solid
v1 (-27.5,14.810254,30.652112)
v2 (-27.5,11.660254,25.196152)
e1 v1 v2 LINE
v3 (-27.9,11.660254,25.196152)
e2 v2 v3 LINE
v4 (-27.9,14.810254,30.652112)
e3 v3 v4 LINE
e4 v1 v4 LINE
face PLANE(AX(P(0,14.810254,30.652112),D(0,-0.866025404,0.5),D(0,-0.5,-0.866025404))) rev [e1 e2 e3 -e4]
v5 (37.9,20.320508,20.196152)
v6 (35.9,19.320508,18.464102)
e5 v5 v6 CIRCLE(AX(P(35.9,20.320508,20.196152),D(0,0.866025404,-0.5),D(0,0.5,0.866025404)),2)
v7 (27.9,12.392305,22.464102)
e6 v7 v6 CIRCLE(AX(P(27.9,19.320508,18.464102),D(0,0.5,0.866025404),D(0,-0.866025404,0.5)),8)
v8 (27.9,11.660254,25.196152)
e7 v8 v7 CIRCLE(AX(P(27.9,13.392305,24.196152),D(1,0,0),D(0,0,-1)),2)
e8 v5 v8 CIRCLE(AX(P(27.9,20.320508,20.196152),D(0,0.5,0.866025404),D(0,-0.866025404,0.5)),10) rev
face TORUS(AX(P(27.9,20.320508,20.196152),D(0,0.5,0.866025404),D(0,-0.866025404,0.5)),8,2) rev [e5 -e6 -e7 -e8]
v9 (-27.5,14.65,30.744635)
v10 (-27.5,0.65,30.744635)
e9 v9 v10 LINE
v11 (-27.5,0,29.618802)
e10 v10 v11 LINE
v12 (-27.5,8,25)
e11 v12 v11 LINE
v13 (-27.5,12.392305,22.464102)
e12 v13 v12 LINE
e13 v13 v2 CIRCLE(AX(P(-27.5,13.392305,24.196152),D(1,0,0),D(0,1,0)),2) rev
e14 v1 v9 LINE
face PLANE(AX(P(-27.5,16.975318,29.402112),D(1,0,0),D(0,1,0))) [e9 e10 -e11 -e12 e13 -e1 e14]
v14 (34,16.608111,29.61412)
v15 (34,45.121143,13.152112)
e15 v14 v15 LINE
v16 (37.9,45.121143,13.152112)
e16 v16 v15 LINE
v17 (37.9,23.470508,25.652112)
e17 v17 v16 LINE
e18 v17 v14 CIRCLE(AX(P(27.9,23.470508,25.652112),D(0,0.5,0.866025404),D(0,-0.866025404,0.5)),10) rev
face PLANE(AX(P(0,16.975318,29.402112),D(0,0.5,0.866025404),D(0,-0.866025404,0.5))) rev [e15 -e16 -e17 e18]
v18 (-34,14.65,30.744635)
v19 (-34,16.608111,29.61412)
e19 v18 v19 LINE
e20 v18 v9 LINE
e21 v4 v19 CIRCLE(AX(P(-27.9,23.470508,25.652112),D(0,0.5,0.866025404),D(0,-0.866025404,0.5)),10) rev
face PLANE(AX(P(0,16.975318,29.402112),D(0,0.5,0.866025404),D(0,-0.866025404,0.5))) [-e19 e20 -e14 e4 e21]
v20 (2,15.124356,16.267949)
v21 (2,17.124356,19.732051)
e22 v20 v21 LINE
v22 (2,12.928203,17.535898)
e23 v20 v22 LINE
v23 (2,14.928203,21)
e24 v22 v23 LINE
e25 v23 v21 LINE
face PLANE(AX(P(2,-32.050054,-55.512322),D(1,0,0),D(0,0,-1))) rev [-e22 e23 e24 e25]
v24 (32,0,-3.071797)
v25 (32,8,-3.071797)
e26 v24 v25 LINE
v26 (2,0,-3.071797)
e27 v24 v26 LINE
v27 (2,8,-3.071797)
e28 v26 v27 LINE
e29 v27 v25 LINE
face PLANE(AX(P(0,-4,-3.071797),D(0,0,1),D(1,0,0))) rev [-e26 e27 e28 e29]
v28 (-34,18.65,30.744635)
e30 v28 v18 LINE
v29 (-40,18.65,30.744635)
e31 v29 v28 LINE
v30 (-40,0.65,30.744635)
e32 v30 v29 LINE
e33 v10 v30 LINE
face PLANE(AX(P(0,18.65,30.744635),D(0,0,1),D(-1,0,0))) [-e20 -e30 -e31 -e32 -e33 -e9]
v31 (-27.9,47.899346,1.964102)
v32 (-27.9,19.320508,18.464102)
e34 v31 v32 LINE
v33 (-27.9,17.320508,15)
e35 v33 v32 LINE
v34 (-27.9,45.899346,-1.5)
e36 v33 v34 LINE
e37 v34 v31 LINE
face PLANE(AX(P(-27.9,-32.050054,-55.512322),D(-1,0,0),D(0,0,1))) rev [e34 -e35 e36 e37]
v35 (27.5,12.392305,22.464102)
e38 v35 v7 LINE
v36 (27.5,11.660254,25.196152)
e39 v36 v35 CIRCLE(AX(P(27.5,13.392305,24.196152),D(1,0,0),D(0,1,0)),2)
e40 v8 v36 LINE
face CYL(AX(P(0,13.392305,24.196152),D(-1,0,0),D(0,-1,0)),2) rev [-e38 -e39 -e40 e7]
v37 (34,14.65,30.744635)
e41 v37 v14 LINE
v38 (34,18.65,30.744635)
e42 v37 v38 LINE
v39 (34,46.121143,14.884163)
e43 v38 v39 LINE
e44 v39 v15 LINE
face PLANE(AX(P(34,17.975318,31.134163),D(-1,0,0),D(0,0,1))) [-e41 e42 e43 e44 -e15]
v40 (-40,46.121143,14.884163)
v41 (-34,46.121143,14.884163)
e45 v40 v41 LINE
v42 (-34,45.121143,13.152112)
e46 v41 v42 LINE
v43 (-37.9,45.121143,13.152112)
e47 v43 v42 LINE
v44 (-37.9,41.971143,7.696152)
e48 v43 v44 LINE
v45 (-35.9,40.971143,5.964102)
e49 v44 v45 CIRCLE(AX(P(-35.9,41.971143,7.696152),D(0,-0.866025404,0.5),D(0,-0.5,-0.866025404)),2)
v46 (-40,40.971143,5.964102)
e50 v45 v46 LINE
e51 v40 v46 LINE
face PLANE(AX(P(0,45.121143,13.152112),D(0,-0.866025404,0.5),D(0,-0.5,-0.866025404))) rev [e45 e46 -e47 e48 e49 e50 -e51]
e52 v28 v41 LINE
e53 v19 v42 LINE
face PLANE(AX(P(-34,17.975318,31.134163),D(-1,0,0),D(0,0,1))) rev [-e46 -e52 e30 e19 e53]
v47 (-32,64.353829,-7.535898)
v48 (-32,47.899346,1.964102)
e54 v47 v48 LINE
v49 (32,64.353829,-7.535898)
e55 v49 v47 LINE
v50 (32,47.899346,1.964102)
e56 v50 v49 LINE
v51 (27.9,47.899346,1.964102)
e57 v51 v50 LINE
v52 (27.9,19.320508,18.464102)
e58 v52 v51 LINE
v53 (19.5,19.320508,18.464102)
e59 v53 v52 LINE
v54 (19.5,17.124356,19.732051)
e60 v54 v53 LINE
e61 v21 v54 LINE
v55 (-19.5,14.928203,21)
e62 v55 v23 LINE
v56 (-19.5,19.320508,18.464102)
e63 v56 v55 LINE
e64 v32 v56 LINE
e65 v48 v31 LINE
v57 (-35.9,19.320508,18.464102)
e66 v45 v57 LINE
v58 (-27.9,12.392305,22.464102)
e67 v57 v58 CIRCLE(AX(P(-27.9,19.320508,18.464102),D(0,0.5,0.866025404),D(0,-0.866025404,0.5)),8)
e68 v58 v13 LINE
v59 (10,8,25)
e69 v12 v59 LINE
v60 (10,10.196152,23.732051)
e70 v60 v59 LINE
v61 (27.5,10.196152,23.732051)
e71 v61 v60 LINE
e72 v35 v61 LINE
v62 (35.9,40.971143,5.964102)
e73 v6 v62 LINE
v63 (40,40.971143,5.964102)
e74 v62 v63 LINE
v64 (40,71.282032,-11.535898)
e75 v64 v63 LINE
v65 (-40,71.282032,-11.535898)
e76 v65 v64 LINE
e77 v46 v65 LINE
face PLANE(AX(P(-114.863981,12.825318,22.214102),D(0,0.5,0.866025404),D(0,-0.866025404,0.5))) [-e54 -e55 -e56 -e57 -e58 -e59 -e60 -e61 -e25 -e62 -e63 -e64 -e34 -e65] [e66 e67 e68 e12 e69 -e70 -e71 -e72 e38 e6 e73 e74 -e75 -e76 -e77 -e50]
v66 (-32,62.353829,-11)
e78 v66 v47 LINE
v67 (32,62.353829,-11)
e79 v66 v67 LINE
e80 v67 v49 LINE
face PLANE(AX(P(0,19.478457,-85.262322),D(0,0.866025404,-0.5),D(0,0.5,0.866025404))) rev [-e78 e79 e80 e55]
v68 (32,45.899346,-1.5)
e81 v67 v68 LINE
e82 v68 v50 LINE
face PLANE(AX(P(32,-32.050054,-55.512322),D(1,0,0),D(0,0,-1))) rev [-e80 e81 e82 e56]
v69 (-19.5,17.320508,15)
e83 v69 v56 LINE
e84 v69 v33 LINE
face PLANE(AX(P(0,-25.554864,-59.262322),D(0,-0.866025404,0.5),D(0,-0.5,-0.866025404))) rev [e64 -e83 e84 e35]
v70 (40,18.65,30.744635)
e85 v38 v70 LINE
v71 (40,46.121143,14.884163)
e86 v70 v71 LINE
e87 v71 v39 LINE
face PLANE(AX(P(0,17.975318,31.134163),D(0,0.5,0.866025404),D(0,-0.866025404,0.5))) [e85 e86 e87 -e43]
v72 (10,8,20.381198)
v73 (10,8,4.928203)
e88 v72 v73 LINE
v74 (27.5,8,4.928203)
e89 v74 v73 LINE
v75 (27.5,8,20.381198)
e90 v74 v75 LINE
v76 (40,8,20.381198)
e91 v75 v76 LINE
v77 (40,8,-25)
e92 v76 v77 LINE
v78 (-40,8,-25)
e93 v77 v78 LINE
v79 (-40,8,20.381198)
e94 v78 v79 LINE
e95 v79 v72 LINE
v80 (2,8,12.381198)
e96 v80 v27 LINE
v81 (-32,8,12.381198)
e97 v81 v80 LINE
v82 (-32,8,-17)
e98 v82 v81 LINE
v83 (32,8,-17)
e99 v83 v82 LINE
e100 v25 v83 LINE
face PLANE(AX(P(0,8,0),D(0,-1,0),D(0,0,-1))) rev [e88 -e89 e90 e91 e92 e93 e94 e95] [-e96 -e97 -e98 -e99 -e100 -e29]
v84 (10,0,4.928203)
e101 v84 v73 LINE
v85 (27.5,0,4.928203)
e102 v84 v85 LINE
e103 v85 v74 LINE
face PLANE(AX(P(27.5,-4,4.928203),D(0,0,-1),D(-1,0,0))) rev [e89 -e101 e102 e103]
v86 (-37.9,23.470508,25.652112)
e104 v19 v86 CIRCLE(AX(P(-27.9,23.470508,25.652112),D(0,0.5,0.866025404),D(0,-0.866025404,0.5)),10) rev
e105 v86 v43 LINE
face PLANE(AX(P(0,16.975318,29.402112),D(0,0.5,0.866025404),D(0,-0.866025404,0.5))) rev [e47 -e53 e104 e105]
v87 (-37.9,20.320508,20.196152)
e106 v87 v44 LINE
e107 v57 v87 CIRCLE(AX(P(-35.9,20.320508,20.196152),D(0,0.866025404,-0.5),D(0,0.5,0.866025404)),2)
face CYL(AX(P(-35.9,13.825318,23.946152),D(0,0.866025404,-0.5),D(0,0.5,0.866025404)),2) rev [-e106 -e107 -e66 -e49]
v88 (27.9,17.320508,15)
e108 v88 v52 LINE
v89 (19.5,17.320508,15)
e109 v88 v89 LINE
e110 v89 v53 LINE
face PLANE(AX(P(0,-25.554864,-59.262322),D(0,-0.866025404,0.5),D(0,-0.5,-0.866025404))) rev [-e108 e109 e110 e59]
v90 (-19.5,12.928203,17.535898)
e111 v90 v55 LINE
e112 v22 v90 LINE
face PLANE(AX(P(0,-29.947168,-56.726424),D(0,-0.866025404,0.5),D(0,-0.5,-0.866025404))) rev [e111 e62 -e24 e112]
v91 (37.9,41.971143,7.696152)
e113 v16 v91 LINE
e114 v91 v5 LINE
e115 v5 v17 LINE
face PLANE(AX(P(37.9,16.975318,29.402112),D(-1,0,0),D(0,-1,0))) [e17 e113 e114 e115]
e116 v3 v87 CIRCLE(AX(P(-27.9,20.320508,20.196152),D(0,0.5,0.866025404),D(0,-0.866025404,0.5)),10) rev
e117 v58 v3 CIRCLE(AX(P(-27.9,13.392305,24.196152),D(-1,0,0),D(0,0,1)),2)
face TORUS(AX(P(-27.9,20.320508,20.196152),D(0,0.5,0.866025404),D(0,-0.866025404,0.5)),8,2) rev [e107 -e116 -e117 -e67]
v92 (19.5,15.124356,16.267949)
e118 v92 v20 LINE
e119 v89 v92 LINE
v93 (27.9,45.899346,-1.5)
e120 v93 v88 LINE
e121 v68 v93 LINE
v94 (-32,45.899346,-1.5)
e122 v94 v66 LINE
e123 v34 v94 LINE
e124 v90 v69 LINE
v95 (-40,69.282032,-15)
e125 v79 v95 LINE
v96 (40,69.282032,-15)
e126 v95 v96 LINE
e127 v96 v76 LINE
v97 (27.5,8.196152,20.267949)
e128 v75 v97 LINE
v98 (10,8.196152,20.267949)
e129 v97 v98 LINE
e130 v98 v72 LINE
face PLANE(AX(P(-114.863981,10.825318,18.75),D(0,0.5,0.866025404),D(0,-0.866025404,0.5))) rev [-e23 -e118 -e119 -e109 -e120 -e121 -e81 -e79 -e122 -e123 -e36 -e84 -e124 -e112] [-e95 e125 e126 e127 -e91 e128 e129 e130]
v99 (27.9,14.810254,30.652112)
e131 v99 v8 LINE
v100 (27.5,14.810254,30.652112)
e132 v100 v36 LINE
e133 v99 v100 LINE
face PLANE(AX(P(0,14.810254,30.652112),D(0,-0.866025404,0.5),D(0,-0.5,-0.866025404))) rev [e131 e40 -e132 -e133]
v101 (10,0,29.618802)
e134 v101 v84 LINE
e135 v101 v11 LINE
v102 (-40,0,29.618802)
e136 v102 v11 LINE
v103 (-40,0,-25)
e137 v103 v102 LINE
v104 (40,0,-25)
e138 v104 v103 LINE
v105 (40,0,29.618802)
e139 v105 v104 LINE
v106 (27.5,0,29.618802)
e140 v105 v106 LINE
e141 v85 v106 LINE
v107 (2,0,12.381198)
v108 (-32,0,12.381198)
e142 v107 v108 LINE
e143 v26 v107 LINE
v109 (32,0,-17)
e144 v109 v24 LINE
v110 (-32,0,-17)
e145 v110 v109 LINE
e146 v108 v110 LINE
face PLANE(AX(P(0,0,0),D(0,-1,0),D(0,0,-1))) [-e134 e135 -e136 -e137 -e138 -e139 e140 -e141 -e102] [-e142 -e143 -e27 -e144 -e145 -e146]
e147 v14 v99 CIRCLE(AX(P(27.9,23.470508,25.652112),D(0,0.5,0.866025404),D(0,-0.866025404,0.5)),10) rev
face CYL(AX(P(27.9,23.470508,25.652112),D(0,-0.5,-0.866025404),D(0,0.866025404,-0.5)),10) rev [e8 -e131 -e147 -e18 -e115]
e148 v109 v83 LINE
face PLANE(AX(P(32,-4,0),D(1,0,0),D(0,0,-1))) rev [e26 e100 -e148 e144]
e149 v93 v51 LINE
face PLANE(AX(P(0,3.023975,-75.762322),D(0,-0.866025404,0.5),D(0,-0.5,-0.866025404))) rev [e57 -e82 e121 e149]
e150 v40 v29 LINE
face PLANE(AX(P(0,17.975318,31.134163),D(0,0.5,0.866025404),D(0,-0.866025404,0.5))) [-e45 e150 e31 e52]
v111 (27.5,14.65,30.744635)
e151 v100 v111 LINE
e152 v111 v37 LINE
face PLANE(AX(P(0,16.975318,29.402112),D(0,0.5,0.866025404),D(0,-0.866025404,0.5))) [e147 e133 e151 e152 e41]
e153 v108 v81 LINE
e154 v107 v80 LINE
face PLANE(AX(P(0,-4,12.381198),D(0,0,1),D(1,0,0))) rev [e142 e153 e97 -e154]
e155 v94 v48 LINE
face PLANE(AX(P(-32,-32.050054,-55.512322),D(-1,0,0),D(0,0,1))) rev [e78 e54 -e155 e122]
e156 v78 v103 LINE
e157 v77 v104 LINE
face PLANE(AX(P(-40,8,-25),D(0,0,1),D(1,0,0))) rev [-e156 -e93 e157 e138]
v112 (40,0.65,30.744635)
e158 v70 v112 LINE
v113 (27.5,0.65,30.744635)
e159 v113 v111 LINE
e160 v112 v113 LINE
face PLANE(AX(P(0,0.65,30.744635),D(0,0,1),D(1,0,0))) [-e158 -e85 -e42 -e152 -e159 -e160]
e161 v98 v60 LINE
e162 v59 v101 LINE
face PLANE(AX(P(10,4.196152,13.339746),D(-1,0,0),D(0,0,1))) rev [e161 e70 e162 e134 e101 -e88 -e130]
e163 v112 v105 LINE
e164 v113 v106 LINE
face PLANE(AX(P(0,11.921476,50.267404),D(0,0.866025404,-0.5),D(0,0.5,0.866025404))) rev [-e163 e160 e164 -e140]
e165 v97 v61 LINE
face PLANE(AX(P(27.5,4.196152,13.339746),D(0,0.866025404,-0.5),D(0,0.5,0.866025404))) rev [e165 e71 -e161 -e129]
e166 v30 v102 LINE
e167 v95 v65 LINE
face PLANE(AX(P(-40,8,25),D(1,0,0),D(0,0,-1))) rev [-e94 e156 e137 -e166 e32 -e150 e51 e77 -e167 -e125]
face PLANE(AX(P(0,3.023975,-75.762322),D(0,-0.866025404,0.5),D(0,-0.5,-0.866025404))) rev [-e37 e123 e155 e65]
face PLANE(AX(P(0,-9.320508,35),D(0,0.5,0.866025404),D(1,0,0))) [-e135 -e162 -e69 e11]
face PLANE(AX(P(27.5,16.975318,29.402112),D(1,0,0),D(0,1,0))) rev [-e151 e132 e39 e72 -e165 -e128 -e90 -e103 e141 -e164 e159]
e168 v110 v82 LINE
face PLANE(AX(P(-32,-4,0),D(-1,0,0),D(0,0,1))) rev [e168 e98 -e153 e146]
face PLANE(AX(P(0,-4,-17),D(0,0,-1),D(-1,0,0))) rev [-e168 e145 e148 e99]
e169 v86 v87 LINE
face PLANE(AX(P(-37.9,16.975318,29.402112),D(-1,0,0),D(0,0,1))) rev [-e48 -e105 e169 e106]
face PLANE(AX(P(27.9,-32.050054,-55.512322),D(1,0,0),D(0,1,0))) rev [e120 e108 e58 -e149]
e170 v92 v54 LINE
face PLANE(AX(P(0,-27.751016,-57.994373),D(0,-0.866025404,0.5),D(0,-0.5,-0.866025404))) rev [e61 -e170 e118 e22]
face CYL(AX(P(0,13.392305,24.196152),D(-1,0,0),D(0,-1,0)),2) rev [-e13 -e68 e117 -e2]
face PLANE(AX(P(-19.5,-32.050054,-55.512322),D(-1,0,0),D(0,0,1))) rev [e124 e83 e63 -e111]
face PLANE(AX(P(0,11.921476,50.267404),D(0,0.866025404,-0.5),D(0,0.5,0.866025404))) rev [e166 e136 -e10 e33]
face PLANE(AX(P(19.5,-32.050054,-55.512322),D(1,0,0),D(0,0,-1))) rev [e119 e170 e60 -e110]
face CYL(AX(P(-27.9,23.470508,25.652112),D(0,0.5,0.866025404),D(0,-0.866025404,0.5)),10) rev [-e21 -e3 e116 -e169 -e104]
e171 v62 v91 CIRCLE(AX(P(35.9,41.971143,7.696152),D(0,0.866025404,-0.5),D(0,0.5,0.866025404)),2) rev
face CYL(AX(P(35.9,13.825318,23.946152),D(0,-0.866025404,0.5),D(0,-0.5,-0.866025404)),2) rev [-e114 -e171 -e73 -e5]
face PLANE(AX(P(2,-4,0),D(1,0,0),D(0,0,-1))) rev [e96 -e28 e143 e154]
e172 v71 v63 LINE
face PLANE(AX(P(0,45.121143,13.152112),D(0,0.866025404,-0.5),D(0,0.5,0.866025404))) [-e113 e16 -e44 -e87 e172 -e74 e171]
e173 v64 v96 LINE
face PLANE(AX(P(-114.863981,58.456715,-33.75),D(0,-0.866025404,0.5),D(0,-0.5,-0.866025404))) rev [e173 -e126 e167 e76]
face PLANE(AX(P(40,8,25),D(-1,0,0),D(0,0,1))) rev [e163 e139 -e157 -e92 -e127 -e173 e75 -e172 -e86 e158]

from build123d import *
from OCP.BRepFilletAPI import BRepFilletAPI_MakeChamfer

# Parameters (mm, degrees)
SKETCH1_W           = 80
SKETCH1_H           = 50
BOSS_EXTRUDE1_DEPTH = 8
BOSS_EXTRUDE2_DEPTH = 80
SKETCH3_W           = 2.1
SKETCH3_H           = 35
BOSS_EXTRUDE3_DEPTH = 8.3
FILLET1_R           = 10
FILLET2_R           = 2
BOSS_EXTRUDE4_DEPTH = 10
CHAMFER2_SIZE       = 17.320508076
CHAMFER2_SIZE_2     = 10
SKETCH5_W           = 12.5
SKETCH5_H           = 9.237604307
BOSS_EXTRUDE5_DEPTH = 8.3
SKETCH6_W           = 6
SKETCH6_H           = 47.309401077
BOSS_EXTRUDE6_DEPTH = 2
CHAMFER3_SIZE       = 9
CHAMFER3_SIZE2      = 15.588457268
SKETCH7_W           = 17.5
SKETCH7_H           = 11.773502692
CUT_EXTRUDE1_DEPTH  = 12
SKETCH8_W           = 17.5
SKETCH8_H           = 15
CUT_EXTRUDE2_DEPTH  = 12
CUT_EXTRUDE3_DEPTH  = 12
CUT_EXTRUDE4_DEPTH  = 4


with BuildPart() as part:
    # Sketch1 → Boss-Extrude1 (new body)
    with BuildSketch(Plane(origin=(0, 0, 0), x_dir=(1, 0, 0), z_dir=(0, 1, 0))):
        Rectangle(SKETCH1_W, SKETCH1_H)
    extrude(amount=BOSS_EXTRUDE1_DEPTH)

    # Sketch2 → Boss-Extrude2 (add)
    with BuildSketch(Plane(origin=(40, 0, 0), x_dir=(0, 0, -1), z_dir=(1, 0, 0))):
        Polygon((15, 69.282032303), (11.535898385, 71.282032303), (-25, 8), (-20.381197846, 8), align=None)
    extrude(amount=-BOSS_EXTRUDE2_DEPTH)

    # Sketch3 → Boss-Extrude3 (add)
    with BuildSketch(Plane(origin=(0, 12.825317547, 22.214101615), x_dir=(1, 0, 0), z_dir=(0, 0.5000000000000041, 0.8660254037844364))):
        with Locations((-38.95, 15)):
            Rectangle(SKETCH3_W, SKETCH3_H)
        Polygon((-27.5, -5.57179677), (-27.5, -2.5), (-37.9, -2.5), (-40, -2.5), (-40, -5.57179677), align=None)
        Polygon((40, -5.57179677), (40, -2.5), (37.9, -2.5), (27.5, -2.5), (27.5, -5.57179677), align=None)
        with Locations((38.95, 15)):
            Rectangle(SKETCH3_W, SKETCH3_H)
    extrude(amount=BOSS_EXTRUDE3_DEPTH)

    # Fillet1
    fillet1_edges = [part.edges().sort_by_distance(p)[0] for p in [
        (-37.9, 12.735254038, 27.058107041),
        (37.9, 12.735254038, 27.058107041),
    ]]
    fillet(fillet1_edges, radius=FILLET1_R)

    # Fillet2
    fillet2_edges = [part.edges().sort_by_distance(p)[0] for p in [
        (-27.7, 10.660254038, 23.464101615),
        (-37.9, 30.145825623, 12.214101615),
        (27.7, 10.660254038, 23.464101615),
        (37.9, 30.145825623, 12.214101615),
        (34.971067812, 13.196783719, 21.999635521),
        (-34.971067812, 13.196783719, 21.999635521),
    ]]
    fillet(fillet2_edges, radius=FILLET2_R)

    # Sketch4 → Boss-Extrude4 (add)
    with BuildSketch(Plane.XY.offset(25)):
        Polygon((40, 0), (40, 8), (27.5, 8), (-27.5, 8), (-40, 8), (-40, 0), align=None)
    extrude(amount=BOSS_EXTRUDE4_DEPTH)

    # Chamfer2
    # the kernel refuses this chamfer: 17.320508076, 10 mm, written as the material it takes off along each edge
    with BuildSketch(Plane(origin=(-84.809639706, 8, 35), x_dir=(0, -0.999813220622208, 0.019326765612700497), z_dir=(1, 0, 0))) as chamfer2_piece_1:
        Polygon((CHAMFER2_SIZE * 0.999813220604, CHAMFER2_SIZE * 0.0193267656124), (-CHAMFER2_SIZE_2 * 0.0193267656127, CHAMFER2_SIZE_2 * 0.999813220622), (0, 0), align=None)
    extrude(amount=169.619279412, mode=Mode.SUBTRACT)

    # Sketch5 → Boss-Extrude5 (add)
    with BuildSketch(Plane(origin=(0, 12.825317547, 22.214101615), x_dir=(1, 0, 0), z_dir=(0, 0.49999999999999656, 0.8660254037844407))):
        with Locations((-33.75, -10.190598924)):
            Rectangle(SKETCH5_W, SKETCH5_H)
        with Locations((33.75, -10.190598924)):
            Rectangle(SKETCH5_W, SKETCH5_H)
    extrude(amount=BOSS_EXTRUDE5_DEPTH)

    # Sketch6 → Boss-Extrude6 (add)
    with BuildSketch(Plane(origin=(0, 16.975317547, 29.402112467), x_dir=(1, 0, 0), z_dir=(0, 0.5000000000000041, 0.8660254037844364))):
        with Locations((-37, 8.845299461)):
            Rectangle(SKETCH6_W, SKETCH6_H)
        with Locations((37, 8.845299461)):
            Rectangle(SKETCH6_W, SKETCH6_H)
    extrude(amount=BOSS_EXTRUDE6_DEPTH)

    # Chamfer3: one chamfer whose edges measure the first distance from different faces: ONE call of the kernel's chamfer builder (chamfer() names one face for all edges)
    chamfer3_edges_1 = [part.edges().sort_by_distance(p)[0] for p in [
        (-37, 5.15, 38.538863812),
    ]]
    chamfer3_side_1 = [part.faces().sort_by_distance(p)[0] for p in [
        (-34.086933045, 2.341954644, 33.675186585),
    ]]
    chamfer3_edges_2 = [part.edges().sort_by_distance(p)[0] for p in [
        (37, 5.15, 38.538863812),
    ]]
    chamfer3_side_2 = [part.faces().sort_by_distance(p)[0] for p in [
        (34.086933045, 2.341954644, 33.675186585),
    ]]
    chamfer3 = BRepFilletAPI_MakeChamfer(part.part.solid().wrapped)
    for e in chamfer3_edges_1:
        chamfer3.Add(CHAMFER3_SIZE, CHAMFER3_SIZE2, e.wrapped, chamfer3_side_1[0].wrapped)  # the first distance lies on this face
    for e in chamfer3_edges_2:
        chamfer3.Add(CHAMFER3_SIZE, CHAMFER3_SIZE2, e.wrapped, chamfer3_side_2[0].wrapped)  # the first distance lies on this face
    add(Compound.cast(chamfer3.Shape()), mode=Mode.REPLACE)

    # Sketch7 → Cut-Extrude1 (cut)
    with BuildSketch(Plane(origin=(0, 12.825317547, 22.214101615), x_dir=(1, 0, 0), z_dir=(0, 0.49999999999999656, 0.8660254037844407))):
        with Locations((18.75, -8.922649731)):
            Rectangle(SKETCH7_W, SKETCH7_H)
    extrude(amount=-CUT_EXTRUDE1_DEPTH, mode=Mode.SUBTRACT)

    # Sketch8 → Cut-Extrude2 (cut)
    with BuildSketch(Plane(origin=(0, 8, 0), x_dir=(1, 0, 0), z_dir=(0, 1, 0))):
        with Locations((18.75, -12.42820323)):
            Rectangle(SKETCH8_W, SKETCH8_H)
    extrude(amount=-CUT_EXTRUDE2_DEPTH, mode=Mode.SUBTRACT)

    # Sketch9 → Cut-Extrude3 (cut)
    with BuildSketch(Plane(origin=(0, 8, 0), x_dir=(1, 0, 0), z_dir=(0, 1, 0))):
        Polygon((-32, -12.381197846), (2, -12.381197846), (2, 3.07179677), (32, 3.07179677), (32, 17), (-32, 17), align=None)
    extrude(amount=-CUT_EXTRUDE3_DEPTH, mode=Mode.SUBTRACT)

    # Sketch10 → Cut-Extrude4 (cut)
    with BuildSketch(Plane(origin=(0, 12.825317547, 22.214101615), x_dir=(1, 0, 0), z_dir=(0, 0.500000000000004, 0.8660254037844365))):
        Polygon((-19.5, 7.5), (-19.5, 2.42820323), (2, 2.42820323), (2, 4.964101615), (19.5, 4.964101615), (19.5, 7.5), (27.9, 7.5), (27.9, 40.5), (32, 40.5), (32, 59.5), (-32, 59.5), (-32, 40.5), (-27.9, 40.5), (-27.9, 7.5), align=None)
    extrude(amount=-CUT_EXTRUDE4_DEPTH, mode=Mode.SUBTRACT)


solid = part.part
